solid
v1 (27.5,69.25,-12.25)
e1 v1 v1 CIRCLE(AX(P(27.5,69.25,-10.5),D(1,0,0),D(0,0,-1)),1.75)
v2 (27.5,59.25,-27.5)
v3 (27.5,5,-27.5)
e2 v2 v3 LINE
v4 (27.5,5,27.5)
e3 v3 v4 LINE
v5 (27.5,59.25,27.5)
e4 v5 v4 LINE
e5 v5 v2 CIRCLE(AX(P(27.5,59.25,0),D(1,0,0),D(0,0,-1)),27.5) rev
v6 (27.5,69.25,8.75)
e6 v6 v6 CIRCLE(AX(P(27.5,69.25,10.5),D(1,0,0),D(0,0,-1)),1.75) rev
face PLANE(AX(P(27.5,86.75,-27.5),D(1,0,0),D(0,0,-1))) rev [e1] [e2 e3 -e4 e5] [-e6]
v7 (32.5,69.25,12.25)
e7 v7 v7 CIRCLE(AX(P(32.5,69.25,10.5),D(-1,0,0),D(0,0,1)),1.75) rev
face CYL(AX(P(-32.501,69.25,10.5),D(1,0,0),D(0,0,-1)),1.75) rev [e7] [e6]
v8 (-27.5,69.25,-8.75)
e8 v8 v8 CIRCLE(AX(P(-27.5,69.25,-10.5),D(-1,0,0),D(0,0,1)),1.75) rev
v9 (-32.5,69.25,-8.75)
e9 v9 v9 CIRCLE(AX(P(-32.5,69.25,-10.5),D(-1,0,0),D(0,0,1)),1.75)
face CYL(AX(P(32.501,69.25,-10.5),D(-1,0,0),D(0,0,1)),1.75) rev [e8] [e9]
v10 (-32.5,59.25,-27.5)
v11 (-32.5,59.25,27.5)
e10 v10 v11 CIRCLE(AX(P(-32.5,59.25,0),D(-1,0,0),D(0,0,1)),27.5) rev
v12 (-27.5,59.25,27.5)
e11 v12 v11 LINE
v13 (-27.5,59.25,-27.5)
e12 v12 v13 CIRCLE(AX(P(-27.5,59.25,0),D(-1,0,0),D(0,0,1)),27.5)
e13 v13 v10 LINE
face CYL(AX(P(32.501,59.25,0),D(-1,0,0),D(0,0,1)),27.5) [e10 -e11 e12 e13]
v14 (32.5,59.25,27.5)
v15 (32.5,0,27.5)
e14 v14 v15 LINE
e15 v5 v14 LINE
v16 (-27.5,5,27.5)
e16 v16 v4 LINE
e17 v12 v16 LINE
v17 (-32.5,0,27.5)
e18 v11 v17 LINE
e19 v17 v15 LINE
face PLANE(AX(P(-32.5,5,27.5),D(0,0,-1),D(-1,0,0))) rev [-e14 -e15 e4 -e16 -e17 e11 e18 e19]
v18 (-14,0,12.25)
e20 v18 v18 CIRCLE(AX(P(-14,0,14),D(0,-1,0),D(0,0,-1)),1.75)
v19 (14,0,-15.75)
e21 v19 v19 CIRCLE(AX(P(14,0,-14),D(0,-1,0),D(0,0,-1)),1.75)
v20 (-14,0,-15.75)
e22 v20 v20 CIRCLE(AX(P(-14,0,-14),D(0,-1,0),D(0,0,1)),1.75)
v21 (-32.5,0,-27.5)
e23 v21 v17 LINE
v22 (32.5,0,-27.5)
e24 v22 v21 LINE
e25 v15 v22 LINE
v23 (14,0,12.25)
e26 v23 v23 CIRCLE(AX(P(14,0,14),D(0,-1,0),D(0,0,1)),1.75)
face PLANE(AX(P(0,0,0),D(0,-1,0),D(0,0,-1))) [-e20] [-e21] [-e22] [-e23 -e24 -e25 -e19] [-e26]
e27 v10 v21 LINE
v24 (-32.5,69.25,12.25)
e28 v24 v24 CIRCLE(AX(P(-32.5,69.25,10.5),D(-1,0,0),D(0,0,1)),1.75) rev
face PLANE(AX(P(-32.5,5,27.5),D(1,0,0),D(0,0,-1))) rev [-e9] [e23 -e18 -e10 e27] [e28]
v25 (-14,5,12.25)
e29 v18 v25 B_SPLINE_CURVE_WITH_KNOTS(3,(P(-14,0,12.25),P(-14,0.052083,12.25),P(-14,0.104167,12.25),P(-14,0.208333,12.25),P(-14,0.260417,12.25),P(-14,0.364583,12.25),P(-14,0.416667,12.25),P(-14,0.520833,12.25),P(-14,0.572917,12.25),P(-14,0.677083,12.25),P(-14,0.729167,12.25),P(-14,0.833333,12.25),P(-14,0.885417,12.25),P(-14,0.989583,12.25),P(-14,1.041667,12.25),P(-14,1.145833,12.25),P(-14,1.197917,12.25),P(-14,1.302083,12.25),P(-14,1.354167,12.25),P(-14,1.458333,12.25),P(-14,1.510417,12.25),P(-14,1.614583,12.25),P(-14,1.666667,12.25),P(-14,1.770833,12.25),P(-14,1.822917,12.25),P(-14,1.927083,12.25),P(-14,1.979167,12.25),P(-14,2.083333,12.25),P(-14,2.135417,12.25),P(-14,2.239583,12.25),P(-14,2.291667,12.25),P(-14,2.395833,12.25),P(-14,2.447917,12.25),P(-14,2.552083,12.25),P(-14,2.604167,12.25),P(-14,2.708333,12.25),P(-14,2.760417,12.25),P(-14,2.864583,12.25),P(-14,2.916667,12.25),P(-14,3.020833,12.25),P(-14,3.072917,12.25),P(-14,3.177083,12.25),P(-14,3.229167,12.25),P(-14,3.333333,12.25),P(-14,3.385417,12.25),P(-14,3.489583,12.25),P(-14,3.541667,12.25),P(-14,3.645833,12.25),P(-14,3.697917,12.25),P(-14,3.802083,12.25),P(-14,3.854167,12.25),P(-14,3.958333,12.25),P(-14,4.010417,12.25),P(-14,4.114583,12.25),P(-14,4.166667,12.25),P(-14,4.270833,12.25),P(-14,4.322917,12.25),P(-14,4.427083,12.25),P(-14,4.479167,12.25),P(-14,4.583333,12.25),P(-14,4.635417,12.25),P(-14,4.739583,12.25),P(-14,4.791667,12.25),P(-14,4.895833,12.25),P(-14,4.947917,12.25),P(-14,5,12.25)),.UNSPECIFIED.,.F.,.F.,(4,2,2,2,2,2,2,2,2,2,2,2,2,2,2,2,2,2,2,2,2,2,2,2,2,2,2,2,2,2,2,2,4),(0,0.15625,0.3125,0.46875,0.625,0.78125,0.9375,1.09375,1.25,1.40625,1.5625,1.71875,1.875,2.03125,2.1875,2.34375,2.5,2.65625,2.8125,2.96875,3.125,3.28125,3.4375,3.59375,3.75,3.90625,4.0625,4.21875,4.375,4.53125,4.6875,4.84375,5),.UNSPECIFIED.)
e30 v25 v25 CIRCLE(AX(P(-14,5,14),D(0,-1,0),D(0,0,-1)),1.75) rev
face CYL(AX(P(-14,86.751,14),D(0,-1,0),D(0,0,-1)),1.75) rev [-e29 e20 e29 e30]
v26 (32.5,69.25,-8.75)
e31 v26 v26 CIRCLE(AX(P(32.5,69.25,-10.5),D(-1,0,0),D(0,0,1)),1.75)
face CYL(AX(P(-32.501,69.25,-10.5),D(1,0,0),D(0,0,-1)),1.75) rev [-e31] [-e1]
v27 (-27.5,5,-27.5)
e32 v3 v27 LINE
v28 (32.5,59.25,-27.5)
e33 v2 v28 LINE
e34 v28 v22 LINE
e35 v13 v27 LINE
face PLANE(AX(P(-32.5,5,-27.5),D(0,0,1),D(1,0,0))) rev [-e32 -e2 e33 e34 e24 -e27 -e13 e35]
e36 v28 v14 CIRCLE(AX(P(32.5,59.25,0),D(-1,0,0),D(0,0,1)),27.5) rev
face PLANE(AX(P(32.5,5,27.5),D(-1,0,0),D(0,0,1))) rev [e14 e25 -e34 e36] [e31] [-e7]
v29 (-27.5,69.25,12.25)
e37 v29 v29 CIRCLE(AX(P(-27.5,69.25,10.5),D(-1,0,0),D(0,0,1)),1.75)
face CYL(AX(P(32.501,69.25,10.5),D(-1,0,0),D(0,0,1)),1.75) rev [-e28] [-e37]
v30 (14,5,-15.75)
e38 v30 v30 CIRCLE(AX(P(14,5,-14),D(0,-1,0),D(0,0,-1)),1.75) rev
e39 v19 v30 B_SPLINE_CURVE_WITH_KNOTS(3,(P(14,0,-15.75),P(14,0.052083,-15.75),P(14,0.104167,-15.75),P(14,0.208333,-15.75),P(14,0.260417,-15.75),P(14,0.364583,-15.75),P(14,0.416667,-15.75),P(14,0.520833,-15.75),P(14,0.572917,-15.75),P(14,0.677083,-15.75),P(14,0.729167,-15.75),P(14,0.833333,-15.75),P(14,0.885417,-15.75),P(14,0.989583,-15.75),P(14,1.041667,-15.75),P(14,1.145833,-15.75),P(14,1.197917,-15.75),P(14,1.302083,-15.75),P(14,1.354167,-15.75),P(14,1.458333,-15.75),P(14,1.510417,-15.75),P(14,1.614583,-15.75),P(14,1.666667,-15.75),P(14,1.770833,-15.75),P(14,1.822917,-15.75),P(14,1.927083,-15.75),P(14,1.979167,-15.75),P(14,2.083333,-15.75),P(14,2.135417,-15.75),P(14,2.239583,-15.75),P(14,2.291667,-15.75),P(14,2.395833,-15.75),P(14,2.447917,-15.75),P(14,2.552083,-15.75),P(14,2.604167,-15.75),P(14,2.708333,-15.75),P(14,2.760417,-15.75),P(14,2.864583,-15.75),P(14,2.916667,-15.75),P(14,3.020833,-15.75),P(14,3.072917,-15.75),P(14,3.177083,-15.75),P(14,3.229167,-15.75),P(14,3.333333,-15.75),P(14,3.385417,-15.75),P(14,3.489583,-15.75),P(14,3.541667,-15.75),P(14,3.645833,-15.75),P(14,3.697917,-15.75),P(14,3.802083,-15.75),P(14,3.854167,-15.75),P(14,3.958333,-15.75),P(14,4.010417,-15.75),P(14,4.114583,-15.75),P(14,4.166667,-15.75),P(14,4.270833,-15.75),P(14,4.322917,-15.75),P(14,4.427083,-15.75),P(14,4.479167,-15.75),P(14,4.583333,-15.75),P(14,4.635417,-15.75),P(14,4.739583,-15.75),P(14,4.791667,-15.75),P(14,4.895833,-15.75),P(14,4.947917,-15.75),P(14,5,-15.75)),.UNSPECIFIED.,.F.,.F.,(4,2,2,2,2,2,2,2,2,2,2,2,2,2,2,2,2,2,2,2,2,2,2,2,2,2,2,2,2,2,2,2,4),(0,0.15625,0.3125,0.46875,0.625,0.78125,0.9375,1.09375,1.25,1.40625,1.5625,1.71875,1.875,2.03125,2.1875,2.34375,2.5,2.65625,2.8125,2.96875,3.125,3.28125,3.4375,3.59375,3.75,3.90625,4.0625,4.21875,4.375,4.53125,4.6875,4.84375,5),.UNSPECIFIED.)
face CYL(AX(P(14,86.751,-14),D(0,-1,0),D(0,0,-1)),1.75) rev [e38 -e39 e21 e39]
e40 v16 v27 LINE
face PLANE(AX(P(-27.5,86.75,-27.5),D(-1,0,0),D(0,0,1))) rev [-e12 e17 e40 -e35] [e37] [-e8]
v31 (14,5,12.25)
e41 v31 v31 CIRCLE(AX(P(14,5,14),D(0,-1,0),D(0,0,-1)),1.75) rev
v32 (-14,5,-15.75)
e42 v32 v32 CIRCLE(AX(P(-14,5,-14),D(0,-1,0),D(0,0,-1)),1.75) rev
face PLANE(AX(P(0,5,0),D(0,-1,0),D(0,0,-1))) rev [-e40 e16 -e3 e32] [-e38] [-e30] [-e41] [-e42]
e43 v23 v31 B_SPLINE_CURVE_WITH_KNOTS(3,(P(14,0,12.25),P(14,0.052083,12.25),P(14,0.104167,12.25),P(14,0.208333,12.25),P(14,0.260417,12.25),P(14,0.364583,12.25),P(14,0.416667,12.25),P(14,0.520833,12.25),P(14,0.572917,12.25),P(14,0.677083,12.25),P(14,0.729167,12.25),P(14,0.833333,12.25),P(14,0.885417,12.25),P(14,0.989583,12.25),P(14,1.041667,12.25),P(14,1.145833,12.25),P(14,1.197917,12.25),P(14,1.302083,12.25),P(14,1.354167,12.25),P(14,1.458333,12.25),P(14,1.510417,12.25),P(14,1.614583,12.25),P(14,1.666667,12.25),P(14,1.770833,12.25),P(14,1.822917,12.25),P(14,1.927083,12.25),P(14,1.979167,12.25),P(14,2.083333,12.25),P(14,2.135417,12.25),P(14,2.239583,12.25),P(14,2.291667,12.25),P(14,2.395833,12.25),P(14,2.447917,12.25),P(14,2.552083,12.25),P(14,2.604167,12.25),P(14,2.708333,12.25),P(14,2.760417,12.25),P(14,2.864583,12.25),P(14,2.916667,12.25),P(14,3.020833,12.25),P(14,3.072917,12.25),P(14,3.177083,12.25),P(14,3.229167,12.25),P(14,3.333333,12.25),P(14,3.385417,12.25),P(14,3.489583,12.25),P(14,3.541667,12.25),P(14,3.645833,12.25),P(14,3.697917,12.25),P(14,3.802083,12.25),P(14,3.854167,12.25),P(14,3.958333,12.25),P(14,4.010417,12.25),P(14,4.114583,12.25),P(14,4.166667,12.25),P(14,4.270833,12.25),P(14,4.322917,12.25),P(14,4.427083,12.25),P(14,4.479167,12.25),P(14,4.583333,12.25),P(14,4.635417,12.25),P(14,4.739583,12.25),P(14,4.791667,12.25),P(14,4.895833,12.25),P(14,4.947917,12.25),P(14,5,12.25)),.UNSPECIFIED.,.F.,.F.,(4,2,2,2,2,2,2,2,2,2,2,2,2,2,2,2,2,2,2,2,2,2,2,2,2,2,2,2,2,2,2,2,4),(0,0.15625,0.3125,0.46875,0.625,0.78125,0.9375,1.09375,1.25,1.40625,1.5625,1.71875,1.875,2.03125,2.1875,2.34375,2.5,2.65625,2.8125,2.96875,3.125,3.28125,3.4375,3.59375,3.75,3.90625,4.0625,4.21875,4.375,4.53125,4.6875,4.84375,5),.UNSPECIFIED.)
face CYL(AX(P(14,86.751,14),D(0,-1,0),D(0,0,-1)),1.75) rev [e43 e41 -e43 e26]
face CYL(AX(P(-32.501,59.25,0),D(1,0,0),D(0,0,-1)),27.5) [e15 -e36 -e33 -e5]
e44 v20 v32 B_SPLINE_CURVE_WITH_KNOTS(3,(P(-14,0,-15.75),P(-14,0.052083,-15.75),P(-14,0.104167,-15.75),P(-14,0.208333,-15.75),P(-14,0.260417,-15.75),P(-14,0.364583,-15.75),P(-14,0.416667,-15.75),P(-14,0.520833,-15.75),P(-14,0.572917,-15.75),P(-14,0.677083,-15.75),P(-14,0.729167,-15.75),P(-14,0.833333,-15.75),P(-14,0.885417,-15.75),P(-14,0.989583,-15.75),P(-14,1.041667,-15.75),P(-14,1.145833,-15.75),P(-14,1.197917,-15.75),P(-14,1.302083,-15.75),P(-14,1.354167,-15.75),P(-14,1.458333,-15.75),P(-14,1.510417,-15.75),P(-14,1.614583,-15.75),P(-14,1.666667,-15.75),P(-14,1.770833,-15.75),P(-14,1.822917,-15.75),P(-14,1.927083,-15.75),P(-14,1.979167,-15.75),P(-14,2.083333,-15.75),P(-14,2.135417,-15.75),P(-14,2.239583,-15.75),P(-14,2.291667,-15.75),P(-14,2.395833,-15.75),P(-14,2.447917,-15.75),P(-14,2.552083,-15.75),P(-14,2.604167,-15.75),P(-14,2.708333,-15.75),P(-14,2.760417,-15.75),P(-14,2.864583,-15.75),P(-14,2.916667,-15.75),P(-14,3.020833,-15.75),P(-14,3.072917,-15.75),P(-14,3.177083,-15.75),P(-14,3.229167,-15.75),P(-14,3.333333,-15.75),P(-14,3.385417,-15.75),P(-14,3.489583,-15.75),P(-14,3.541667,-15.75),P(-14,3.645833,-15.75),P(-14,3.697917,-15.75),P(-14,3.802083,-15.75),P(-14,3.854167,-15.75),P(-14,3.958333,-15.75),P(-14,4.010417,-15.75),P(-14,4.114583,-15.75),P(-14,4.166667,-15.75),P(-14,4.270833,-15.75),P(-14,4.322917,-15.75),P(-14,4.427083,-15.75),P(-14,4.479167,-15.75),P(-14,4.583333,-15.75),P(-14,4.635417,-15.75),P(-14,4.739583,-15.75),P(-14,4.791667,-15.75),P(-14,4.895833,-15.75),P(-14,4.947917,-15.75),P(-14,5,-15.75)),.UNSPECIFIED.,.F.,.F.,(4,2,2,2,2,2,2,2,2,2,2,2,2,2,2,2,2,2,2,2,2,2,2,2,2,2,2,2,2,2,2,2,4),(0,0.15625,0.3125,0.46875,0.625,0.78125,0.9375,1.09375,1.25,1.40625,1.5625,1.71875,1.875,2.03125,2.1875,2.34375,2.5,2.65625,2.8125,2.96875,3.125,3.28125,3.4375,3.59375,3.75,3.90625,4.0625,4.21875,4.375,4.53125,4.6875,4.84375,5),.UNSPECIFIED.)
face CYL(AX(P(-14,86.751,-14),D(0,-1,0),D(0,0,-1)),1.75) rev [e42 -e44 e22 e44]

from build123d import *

# Parameters (mm, degrees)
SKETCH1_W           = 65
SKETCH1_H           = 55
BOSS_EXTRUDE1_DEPTH = 5
SKETCH2_W           = 5
SKETCH2_H           = 55
BOSS_EXTRUDE2_DEPTH = 81.75
CUT_EXTRUDE1_REACH  = 113.834
SKETCH3_R           = 1.75
CUT_EXTRUDE2_REACH  = 98.634
SKETCH4_R           = 1.75


with BuildPart() as part:
    # Sketch1 → Boss-Extrude1 (new body)
    with BuildSketch(Plane(origin=(0, 0, 0), x_dir=(1, 0, 0), z_dir=(0, 1, 0))):
        Rectangle(SKETCH1_W, SKETCH1_H)
    extrude(amount=BOSS_EXTRUDE1_DEPTH)

    # Sketch2 → Boss-Extrude2 (add)
    with BuildSketch(Plane(origin=(0, 5, 0), x_dir=(1, 0, 0), z_dir=(0, 1, 0))):
        with Locations((-30, 0)):
            Rectangle(SKETCH2_W, SKETCH2_H)
        with Locations((30, 0)):
            Rectangle(SKETCH2_W, SKETCH2_H)
    extrude(amount=BOSS_EXTRUDE2_DEPTH)

    # Sketch3 → Cut-Extrude1 (cut, up to next)
    with BuildSketch(Plane.ZY.offset(32.5), mode=Mode.PRIVATE) as cut_extrude1_sk1:
        with BuildLine():
            Line((27.5, 86.75), (-2.9e-08, 86.75))
            ThreePointArc((-2.9e-08, 86.75), (19.445436472, 78.695436493), (27.5, 59.25))
            Line((27.5, 59.25), (27.5, 86.75))
        make_face()
    cut_extrude1_tool1 = extrude(cut_extrude1_sk1.sketch, amount=-CUT_EXTRUDE1_REACH, mode=Mode.PRIVATE) & part.part
    # Sketch3 → Cut-Extrude1 (cut, up to next)
    with BuildSketch(Plane.ZY.offset(32.5), mode=Mode.PRIVATE) as cut_extrude1_sk2:
        with BuildLine():
            Line((-2.9e-08, 86.75), (-27.5, 86.75))
            Line((-27.5, 86.75), (-27.5, 59.25))
            ThreePointArc((-27.5, 59.25), (-19.445436493, 78.695436472), (-2.9e-08, 86.75))
        make_face()
    cut_extrude1_tool2 = extrude(cut_extrude1_sk2.sketch, amount=-CUT_EXTRUDE1_REACH, mode=Mode.PRIVATE) & part.part
    # Sketch3 → Cut-Extrude1 (cut, up to next)
    with BuildSketch(Plane.ZY.offset(32.5), mode=Mode.PRIVATE) as cut_extrude1_sk3:
        with Locations((-10.5, 69.25)):
            Circle(SKETCH3_R)
    cut_extrude1_tool3 = extrude(cut_extrude1_sk3.sketch, amount=-CUT_EXTRUDE1_REACH, mode=Mode.PRIVATE) & part.part
    # Sketch3 → Cut-Extrude1 (cut, up to next)
    with BuildSketch(Plane.ZY.offset(32.5), mode=Mode.PRIVATE) as cut_extrude1_sk4:
        with Locations((10.5, 69.25)):
            Circle(SKETCH3_R)
    cut_extrude1_tool4 = extrude(cut_extrude1_sk4.sketch, amount=-CUT_EXTRUDE1_REACH, mode=Mode.PRIVATE) & part.part
    cut_extrude1_1 = cut_extrude1_tool1.solids().sort_by_distance((-32.5, 80.607382, 21.357382))[0]
    add(cut_extrude1_1, mode=Mode.SUBTRACT)
    cut_extrude1_2 = cut_extrude1_tool2.solids().sort_by_distance((-32.5, 80.607382, -21.357382))[0]
    add(cut_extrude1_2, mode=Mode.SUBTRACT)
    cut_extrude1_3 = cut_extrude1_tool3.solids().sort_by_distance((-32.5, 69.25, -10.5))[0]
    add(cut_extrude1_3, mode=Mode.SUBTRACT)
    cut_extrude1_4 = cut_extrude1_tool4.solids().sort_by_distance((-32.5, 69.25, 10.5))[0]
    add(cut_extrude1_4, mode=Mode.SUBTRACT)
    cut_extrude1 = cut_extrude1_1 + cut_extrude1_2 + cut_extrude1_3 + cut_extrude1_4  # Cut-Extrude1 as one shape, for the pattern or mirror that repeats it

    # Mirror1: Cut-Extrude1 across plane
    add(cut_extrude1.mirror(Plane(origin=(0, 0, 0), x_dir=(0, 0, 1), z_dir=(1, 0, 0))), mode=Mode.SUBTRACT)

    # Sketch4 → Cut-Extrude2 (cut, up to next)
    with BuildSketch(Plane.XZ, mode=Mode.PRIVATE) as cut_extrude2_sk1:
        with Locations((-14, 14)):
            Circle(SKETCH4_R)
    cut_extrude2_tool1 = extrude(cut_extrude2_sk1.sketch, amount=-CUT_EXTRUDE2_REACH, mode=Mode.PRIVATE) & part.part
    # Sketch4 → Cut-Extrude2 (cut, up to next)
    with BuildSketch(Plane.XZ, mode=Mode.PRIVATE) as cut_extrude2_sk2:
        with Locations((-14, -14)):
            Circle(SKETCH4_R)
    cut_extrude2_tool2 = extrude(cut_extrude2_sk2.sketch, amount=-CUT_EXTRUDE2_REACH, mode=Mode.PRIVATE) & part.part
    # Sketch4 → Cut-Extrude2 (cut, up to next)
    with BuildSketch(Plane.XZ, mode=Mode.PRIVATE) as cut_extrude2_sk3:
        with Locations((14, -14)):
            Circle(SKETCH4_R)
    cut_extrude2_tool3 = extrude(cut_extrude2_sk3.sketch, amount=-CUT_EXTRUDE2_REACH, mode=Mode.PRIVATE) & part.part
    # Sketch4 → Cut-Extrude2 (cut, up to next)
    with BuildSketch(Plane.XZ, mode=Mode.PRIVATE) as cut_extrude2_sk4:
        with Locations((14, 14)):
            Circle(SKETCH4_R)
    cut_extrude2_tool4 = extrude(cut_extrude2_sk4.sketch, amount=-CUT_EXTRUDE2_REACH, mode=Mode.PRIVATE) & part.part
    add(cut_extrude2_tool1.solids().sort_by_distance((-14, 0, 14))[0], mode=Mode.SUBTRACT)
    add(cut_extrude2_tool2.solids().sort_by_distance((-14, 0, -14))[0], mode=Mode.SUBTRACT)
    add(cut_extrude2_tool3.solids().sort_by_distance((14, 0, -14))[0], mode=Mode.SUBTRACT)
    add(cut_extrude2_tool4.solids().sort_by_distance((14, 0, 14))[0], mode=Mode.SUBTRACT)


solid = part.part
